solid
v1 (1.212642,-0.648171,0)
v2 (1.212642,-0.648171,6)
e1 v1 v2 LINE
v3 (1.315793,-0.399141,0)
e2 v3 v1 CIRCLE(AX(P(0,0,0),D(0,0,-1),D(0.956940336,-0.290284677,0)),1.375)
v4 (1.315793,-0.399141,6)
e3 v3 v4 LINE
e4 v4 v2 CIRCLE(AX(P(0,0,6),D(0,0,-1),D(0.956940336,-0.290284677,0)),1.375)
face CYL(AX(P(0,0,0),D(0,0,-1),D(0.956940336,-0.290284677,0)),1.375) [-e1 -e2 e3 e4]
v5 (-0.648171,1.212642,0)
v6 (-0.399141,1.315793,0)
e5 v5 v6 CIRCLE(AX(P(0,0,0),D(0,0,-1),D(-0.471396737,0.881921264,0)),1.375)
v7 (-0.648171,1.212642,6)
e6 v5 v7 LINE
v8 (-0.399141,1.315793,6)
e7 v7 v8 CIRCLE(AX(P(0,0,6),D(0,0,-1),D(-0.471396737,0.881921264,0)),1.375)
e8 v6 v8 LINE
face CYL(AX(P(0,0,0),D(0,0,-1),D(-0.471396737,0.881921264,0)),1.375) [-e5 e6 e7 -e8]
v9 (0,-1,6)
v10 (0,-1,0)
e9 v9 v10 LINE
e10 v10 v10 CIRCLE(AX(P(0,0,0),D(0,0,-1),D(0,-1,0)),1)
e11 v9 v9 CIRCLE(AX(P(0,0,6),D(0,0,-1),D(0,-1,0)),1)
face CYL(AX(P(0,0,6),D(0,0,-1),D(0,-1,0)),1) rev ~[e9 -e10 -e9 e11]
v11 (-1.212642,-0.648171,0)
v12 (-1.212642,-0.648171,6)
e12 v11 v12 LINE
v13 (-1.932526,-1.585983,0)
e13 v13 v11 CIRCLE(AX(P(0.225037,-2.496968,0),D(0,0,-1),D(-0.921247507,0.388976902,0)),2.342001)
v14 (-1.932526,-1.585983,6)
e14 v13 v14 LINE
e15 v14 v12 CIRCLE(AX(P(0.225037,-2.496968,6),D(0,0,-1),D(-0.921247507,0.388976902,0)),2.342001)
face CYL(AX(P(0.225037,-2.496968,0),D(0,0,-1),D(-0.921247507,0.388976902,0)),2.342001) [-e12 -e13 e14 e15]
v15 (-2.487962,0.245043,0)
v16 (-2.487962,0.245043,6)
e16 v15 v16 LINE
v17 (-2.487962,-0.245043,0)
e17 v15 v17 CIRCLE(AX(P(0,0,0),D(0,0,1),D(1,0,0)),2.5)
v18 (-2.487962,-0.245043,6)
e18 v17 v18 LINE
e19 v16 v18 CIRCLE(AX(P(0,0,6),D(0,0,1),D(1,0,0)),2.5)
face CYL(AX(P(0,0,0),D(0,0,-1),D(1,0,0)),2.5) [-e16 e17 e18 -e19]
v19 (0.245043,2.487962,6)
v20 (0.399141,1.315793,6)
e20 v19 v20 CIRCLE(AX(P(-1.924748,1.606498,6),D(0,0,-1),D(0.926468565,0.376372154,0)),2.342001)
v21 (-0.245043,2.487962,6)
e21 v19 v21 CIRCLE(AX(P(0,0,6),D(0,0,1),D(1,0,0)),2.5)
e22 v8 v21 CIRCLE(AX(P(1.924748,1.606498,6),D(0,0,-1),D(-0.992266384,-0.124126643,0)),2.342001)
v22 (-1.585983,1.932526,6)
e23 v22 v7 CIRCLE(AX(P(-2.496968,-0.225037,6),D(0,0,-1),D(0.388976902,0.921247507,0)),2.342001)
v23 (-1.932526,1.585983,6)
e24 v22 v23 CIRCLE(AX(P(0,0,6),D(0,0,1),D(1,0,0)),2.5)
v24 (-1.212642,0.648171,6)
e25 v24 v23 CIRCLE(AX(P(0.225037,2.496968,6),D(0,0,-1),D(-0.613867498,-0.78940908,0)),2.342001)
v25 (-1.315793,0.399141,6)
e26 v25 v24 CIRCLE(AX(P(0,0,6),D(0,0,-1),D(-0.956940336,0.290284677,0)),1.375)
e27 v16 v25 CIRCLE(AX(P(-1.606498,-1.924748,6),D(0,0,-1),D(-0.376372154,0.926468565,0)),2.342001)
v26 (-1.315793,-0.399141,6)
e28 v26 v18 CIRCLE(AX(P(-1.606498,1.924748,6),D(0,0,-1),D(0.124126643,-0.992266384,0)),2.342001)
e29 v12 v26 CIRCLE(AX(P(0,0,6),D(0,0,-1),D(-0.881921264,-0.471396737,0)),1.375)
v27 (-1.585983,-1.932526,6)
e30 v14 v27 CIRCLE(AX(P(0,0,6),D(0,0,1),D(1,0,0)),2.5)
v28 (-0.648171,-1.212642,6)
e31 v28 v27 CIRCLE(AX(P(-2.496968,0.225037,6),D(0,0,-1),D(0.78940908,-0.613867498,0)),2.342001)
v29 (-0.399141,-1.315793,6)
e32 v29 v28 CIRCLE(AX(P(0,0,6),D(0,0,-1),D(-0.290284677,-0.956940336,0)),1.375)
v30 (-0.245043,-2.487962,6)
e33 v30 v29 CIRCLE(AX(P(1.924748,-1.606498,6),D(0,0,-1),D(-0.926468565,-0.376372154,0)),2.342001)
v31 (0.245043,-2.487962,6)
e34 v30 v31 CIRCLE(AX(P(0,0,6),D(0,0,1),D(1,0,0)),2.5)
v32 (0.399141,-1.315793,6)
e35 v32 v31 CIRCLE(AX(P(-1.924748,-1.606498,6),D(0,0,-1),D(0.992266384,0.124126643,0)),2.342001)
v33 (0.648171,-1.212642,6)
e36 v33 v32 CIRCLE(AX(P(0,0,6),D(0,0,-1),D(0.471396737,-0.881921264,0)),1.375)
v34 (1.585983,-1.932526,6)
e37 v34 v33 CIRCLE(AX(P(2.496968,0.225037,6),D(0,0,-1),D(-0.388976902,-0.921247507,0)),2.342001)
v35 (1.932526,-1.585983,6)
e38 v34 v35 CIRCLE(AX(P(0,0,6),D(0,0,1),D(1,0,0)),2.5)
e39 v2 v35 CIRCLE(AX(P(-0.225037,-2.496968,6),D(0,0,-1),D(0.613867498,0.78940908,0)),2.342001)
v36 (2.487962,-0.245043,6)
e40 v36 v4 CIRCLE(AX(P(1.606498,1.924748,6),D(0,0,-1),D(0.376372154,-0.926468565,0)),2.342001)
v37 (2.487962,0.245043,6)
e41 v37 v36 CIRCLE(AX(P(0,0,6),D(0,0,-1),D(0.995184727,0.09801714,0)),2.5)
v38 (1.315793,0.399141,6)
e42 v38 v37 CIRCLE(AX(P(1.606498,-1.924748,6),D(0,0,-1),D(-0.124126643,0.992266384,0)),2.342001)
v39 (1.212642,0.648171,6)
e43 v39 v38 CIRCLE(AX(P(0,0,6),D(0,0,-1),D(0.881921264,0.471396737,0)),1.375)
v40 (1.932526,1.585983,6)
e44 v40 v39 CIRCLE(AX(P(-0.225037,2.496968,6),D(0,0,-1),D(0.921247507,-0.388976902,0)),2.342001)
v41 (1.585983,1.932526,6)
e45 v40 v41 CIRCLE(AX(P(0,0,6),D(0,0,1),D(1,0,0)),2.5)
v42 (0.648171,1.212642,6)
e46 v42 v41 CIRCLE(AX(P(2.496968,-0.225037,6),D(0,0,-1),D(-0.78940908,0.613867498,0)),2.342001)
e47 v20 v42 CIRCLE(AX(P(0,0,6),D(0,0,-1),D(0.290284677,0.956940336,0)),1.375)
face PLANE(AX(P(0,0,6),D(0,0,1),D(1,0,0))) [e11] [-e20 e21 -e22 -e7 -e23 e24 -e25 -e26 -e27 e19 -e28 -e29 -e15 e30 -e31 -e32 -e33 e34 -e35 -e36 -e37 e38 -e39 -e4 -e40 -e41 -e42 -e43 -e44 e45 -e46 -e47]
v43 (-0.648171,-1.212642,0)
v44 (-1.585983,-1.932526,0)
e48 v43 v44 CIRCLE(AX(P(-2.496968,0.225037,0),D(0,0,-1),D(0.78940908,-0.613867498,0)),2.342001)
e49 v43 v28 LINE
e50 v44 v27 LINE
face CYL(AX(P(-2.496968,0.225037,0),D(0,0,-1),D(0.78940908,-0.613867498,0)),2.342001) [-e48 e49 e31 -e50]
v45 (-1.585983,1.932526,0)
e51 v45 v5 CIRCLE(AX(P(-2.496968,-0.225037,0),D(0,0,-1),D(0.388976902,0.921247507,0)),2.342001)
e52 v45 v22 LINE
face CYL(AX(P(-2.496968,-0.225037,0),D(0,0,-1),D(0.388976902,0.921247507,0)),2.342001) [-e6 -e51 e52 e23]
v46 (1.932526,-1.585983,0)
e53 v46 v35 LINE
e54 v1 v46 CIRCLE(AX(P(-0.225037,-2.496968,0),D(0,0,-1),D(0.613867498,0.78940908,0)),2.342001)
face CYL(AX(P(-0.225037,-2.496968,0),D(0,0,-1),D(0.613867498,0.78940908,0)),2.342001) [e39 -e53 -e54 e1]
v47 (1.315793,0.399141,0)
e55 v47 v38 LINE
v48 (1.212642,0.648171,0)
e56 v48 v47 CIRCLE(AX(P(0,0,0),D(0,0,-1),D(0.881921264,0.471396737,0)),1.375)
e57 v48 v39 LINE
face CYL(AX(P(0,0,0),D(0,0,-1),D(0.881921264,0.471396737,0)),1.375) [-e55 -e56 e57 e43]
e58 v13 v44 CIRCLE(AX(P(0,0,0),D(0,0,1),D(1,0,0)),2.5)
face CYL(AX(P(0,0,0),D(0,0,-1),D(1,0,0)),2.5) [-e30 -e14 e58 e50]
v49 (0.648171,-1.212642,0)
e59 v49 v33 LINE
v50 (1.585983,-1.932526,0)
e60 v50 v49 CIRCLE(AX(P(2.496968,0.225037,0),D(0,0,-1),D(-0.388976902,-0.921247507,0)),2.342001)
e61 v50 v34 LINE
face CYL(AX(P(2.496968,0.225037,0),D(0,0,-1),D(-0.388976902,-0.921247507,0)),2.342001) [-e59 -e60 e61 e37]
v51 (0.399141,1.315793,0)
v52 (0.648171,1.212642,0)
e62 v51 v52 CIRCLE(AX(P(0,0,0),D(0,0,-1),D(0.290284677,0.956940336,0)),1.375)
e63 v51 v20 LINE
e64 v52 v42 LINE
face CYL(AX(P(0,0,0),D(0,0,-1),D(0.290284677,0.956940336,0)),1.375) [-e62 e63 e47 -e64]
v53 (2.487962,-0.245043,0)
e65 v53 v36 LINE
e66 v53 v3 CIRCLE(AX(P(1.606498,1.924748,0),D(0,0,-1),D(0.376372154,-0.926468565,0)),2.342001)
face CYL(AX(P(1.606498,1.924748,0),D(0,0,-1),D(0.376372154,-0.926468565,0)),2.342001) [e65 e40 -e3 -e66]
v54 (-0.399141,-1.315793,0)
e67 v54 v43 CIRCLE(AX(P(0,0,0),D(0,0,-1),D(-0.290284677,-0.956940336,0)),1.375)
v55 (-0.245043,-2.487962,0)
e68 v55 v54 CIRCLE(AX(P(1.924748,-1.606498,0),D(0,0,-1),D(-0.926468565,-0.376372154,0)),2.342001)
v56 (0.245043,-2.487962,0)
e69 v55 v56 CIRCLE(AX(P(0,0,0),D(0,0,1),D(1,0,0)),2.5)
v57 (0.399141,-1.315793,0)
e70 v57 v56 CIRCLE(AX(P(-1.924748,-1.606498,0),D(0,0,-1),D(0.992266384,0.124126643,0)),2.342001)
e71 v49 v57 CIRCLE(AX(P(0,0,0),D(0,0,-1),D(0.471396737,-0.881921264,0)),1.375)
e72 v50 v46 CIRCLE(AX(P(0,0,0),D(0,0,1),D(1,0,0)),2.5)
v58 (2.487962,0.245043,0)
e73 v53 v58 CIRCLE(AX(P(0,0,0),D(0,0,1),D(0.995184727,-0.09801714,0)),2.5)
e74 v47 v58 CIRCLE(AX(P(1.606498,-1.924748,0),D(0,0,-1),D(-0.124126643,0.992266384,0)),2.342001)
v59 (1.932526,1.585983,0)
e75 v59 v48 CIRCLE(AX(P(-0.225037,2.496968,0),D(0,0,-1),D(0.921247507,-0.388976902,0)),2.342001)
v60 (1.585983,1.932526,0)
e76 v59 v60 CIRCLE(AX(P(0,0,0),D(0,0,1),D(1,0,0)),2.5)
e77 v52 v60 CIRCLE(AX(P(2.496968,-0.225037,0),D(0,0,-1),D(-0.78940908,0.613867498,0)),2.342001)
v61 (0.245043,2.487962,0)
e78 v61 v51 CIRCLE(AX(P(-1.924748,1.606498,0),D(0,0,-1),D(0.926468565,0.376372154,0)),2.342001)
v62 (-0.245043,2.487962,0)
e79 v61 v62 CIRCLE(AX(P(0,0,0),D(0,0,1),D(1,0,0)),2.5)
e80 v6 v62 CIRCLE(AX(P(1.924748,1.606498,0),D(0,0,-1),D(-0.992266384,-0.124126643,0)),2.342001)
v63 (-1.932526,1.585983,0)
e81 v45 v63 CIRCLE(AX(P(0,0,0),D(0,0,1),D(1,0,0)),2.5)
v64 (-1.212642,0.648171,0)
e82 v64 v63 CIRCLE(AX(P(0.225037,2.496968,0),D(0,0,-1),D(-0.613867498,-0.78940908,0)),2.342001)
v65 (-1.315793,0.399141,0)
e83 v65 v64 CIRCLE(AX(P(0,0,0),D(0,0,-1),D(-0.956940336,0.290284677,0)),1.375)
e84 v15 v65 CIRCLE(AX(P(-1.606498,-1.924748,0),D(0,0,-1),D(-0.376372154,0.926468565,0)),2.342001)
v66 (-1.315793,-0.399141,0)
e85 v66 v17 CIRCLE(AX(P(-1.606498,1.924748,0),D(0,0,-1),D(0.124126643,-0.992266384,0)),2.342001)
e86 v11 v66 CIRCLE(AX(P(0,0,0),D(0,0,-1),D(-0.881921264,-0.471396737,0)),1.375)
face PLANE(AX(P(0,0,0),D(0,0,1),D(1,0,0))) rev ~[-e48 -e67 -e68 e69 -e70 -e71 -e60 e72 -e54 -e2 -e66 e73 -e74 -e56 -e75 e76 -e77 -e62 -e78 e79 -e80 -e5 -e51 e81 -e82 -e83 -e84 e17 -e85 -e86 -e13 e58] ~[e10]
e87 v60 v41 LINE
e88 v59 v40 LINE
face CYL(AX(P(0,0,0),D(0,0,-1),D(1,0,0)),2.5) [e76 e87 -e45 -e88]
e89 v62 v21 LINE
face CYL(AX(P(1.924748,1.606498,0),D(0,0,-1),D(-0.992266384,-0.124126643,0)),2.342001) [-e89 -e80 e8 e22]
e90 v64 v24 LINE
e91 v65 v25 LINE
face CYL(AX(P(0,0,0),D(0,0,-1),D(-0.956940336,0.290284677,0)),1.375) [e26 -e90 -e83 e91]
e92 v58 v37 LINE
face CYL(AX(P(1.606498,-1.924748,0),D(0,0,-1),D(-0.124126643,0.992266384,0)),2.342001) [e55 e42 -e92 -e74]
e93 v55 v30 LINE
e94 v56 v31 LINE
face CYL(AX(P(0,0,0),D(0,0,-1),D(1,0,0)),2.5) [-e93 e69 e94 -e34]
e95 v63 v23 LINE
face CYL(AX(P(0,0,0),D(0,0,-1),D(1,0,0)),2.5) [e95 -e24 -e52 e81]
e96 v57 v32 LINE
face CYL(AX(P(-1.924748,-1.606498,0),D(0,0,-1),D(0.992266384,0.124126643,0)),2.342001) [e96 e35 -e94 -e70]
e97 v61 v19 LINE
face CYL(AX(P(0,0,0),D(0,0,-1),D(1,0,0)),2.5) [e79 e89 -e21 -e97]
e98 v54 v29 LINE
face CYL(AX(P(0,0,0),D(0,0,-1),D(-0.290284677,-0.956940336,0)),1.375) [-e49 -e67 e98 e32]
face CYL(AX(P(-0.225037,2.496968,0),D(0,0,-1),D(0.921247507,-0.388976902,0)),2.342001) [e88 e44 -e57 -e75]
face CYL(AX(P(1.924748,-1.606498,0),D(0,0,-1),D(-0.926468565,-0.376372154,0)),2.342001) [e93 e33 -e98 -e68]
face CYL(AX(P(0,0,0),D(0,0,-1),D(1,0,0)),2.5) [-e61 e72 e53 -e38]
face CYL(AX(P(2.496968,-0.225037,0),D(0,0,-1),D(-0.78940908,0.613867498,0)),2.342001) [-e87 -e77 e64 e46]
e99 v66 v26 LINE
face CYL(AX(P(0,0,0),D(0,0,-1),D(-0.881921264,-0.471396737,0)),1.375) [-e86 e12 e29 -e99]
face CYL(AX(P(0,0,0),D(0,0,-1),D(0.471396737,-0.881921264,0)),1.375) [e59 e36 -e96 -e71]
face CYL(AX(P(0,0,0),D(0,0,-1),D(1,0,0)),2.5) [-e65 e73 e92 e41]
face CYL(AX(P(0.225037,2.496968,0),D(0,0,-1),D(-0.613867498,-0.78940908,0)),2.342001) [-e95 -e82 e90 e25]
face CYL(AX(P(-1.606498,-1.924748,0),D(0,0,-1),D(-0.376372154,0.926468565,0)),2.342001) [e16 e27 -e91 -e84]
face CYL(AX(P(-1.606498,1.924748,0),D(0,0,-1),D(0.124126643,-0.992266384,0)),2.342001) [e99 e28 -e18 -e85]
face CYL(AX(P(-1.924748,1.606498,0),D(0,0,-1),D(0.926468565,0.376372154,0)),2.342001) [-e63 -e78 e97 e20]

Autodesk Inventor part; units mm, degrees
sketch "Sketch1" plane through (0, 0, 0) normal (0, 0, 1) x (1, 0, 0)
  circle A0 centre (0, 0) radius 2.5
  dimension "d0" = 5
extrude "Extrusion1" add sketch "Sketch1" along normal blind 6
ref_plane "Work Plane2" through (0, 0, 3) normal (0, 0, 1) x (1, 0, 0)
sketch "Sketch2" plane through (0, 0, 0) normal (0, 0, -1) x (-1, 0, 0)
  circle A0 centre (0, 0) radius 2.5 projected
  circle A1 centre (0, 0) radius 2
  dimension "d3" = 4
surface extrude "ピッチ円直径" sketch "Sketch2" against normal through all shown no curves A1
ref_plane "Work Plane8" through (0, 0, 0) normal (0.9238795, 0.3826834, 0) x (0, 0, 1)
ref_plane "Work Plane9" through (0, 0, 0) normal (1, 0, 0) x (0, 1, 0)
spur gear teeth "平歯車" teeth 8 pitch diameter 4 tip diameter 5 root diameter 2.75 face width 6 start plane through (0, 0, 0) normal (0, 0, -1) x (-1, 0, 0)
sketch "スケッチ3" plane through (0, 0, 6) normal (0, 0, 1) x (1, 0, 0)
  point P0 (0, 0)
  point P1 (0, 0)
hole "穴1" at (0, 0, 6) direction (0, 0, -1) diameter 2 end through all
equation "\"d0\" = da_da"
equation "\"d1\" = da_b"
equation "\"d3\" = da_dw"
equation "\"d16\" = da_aw"
equation "\"d43\" = da_aw"
equation "\"d46\" = da_aw"
equation "\"da_da\" = 5"
equation "\"da_b\" = 6"
equation "\"da_dw\" = 4"
equation "\"da_aw\" = 4"
properties part number "平歯車1" material "アセタール樹脂、白"
